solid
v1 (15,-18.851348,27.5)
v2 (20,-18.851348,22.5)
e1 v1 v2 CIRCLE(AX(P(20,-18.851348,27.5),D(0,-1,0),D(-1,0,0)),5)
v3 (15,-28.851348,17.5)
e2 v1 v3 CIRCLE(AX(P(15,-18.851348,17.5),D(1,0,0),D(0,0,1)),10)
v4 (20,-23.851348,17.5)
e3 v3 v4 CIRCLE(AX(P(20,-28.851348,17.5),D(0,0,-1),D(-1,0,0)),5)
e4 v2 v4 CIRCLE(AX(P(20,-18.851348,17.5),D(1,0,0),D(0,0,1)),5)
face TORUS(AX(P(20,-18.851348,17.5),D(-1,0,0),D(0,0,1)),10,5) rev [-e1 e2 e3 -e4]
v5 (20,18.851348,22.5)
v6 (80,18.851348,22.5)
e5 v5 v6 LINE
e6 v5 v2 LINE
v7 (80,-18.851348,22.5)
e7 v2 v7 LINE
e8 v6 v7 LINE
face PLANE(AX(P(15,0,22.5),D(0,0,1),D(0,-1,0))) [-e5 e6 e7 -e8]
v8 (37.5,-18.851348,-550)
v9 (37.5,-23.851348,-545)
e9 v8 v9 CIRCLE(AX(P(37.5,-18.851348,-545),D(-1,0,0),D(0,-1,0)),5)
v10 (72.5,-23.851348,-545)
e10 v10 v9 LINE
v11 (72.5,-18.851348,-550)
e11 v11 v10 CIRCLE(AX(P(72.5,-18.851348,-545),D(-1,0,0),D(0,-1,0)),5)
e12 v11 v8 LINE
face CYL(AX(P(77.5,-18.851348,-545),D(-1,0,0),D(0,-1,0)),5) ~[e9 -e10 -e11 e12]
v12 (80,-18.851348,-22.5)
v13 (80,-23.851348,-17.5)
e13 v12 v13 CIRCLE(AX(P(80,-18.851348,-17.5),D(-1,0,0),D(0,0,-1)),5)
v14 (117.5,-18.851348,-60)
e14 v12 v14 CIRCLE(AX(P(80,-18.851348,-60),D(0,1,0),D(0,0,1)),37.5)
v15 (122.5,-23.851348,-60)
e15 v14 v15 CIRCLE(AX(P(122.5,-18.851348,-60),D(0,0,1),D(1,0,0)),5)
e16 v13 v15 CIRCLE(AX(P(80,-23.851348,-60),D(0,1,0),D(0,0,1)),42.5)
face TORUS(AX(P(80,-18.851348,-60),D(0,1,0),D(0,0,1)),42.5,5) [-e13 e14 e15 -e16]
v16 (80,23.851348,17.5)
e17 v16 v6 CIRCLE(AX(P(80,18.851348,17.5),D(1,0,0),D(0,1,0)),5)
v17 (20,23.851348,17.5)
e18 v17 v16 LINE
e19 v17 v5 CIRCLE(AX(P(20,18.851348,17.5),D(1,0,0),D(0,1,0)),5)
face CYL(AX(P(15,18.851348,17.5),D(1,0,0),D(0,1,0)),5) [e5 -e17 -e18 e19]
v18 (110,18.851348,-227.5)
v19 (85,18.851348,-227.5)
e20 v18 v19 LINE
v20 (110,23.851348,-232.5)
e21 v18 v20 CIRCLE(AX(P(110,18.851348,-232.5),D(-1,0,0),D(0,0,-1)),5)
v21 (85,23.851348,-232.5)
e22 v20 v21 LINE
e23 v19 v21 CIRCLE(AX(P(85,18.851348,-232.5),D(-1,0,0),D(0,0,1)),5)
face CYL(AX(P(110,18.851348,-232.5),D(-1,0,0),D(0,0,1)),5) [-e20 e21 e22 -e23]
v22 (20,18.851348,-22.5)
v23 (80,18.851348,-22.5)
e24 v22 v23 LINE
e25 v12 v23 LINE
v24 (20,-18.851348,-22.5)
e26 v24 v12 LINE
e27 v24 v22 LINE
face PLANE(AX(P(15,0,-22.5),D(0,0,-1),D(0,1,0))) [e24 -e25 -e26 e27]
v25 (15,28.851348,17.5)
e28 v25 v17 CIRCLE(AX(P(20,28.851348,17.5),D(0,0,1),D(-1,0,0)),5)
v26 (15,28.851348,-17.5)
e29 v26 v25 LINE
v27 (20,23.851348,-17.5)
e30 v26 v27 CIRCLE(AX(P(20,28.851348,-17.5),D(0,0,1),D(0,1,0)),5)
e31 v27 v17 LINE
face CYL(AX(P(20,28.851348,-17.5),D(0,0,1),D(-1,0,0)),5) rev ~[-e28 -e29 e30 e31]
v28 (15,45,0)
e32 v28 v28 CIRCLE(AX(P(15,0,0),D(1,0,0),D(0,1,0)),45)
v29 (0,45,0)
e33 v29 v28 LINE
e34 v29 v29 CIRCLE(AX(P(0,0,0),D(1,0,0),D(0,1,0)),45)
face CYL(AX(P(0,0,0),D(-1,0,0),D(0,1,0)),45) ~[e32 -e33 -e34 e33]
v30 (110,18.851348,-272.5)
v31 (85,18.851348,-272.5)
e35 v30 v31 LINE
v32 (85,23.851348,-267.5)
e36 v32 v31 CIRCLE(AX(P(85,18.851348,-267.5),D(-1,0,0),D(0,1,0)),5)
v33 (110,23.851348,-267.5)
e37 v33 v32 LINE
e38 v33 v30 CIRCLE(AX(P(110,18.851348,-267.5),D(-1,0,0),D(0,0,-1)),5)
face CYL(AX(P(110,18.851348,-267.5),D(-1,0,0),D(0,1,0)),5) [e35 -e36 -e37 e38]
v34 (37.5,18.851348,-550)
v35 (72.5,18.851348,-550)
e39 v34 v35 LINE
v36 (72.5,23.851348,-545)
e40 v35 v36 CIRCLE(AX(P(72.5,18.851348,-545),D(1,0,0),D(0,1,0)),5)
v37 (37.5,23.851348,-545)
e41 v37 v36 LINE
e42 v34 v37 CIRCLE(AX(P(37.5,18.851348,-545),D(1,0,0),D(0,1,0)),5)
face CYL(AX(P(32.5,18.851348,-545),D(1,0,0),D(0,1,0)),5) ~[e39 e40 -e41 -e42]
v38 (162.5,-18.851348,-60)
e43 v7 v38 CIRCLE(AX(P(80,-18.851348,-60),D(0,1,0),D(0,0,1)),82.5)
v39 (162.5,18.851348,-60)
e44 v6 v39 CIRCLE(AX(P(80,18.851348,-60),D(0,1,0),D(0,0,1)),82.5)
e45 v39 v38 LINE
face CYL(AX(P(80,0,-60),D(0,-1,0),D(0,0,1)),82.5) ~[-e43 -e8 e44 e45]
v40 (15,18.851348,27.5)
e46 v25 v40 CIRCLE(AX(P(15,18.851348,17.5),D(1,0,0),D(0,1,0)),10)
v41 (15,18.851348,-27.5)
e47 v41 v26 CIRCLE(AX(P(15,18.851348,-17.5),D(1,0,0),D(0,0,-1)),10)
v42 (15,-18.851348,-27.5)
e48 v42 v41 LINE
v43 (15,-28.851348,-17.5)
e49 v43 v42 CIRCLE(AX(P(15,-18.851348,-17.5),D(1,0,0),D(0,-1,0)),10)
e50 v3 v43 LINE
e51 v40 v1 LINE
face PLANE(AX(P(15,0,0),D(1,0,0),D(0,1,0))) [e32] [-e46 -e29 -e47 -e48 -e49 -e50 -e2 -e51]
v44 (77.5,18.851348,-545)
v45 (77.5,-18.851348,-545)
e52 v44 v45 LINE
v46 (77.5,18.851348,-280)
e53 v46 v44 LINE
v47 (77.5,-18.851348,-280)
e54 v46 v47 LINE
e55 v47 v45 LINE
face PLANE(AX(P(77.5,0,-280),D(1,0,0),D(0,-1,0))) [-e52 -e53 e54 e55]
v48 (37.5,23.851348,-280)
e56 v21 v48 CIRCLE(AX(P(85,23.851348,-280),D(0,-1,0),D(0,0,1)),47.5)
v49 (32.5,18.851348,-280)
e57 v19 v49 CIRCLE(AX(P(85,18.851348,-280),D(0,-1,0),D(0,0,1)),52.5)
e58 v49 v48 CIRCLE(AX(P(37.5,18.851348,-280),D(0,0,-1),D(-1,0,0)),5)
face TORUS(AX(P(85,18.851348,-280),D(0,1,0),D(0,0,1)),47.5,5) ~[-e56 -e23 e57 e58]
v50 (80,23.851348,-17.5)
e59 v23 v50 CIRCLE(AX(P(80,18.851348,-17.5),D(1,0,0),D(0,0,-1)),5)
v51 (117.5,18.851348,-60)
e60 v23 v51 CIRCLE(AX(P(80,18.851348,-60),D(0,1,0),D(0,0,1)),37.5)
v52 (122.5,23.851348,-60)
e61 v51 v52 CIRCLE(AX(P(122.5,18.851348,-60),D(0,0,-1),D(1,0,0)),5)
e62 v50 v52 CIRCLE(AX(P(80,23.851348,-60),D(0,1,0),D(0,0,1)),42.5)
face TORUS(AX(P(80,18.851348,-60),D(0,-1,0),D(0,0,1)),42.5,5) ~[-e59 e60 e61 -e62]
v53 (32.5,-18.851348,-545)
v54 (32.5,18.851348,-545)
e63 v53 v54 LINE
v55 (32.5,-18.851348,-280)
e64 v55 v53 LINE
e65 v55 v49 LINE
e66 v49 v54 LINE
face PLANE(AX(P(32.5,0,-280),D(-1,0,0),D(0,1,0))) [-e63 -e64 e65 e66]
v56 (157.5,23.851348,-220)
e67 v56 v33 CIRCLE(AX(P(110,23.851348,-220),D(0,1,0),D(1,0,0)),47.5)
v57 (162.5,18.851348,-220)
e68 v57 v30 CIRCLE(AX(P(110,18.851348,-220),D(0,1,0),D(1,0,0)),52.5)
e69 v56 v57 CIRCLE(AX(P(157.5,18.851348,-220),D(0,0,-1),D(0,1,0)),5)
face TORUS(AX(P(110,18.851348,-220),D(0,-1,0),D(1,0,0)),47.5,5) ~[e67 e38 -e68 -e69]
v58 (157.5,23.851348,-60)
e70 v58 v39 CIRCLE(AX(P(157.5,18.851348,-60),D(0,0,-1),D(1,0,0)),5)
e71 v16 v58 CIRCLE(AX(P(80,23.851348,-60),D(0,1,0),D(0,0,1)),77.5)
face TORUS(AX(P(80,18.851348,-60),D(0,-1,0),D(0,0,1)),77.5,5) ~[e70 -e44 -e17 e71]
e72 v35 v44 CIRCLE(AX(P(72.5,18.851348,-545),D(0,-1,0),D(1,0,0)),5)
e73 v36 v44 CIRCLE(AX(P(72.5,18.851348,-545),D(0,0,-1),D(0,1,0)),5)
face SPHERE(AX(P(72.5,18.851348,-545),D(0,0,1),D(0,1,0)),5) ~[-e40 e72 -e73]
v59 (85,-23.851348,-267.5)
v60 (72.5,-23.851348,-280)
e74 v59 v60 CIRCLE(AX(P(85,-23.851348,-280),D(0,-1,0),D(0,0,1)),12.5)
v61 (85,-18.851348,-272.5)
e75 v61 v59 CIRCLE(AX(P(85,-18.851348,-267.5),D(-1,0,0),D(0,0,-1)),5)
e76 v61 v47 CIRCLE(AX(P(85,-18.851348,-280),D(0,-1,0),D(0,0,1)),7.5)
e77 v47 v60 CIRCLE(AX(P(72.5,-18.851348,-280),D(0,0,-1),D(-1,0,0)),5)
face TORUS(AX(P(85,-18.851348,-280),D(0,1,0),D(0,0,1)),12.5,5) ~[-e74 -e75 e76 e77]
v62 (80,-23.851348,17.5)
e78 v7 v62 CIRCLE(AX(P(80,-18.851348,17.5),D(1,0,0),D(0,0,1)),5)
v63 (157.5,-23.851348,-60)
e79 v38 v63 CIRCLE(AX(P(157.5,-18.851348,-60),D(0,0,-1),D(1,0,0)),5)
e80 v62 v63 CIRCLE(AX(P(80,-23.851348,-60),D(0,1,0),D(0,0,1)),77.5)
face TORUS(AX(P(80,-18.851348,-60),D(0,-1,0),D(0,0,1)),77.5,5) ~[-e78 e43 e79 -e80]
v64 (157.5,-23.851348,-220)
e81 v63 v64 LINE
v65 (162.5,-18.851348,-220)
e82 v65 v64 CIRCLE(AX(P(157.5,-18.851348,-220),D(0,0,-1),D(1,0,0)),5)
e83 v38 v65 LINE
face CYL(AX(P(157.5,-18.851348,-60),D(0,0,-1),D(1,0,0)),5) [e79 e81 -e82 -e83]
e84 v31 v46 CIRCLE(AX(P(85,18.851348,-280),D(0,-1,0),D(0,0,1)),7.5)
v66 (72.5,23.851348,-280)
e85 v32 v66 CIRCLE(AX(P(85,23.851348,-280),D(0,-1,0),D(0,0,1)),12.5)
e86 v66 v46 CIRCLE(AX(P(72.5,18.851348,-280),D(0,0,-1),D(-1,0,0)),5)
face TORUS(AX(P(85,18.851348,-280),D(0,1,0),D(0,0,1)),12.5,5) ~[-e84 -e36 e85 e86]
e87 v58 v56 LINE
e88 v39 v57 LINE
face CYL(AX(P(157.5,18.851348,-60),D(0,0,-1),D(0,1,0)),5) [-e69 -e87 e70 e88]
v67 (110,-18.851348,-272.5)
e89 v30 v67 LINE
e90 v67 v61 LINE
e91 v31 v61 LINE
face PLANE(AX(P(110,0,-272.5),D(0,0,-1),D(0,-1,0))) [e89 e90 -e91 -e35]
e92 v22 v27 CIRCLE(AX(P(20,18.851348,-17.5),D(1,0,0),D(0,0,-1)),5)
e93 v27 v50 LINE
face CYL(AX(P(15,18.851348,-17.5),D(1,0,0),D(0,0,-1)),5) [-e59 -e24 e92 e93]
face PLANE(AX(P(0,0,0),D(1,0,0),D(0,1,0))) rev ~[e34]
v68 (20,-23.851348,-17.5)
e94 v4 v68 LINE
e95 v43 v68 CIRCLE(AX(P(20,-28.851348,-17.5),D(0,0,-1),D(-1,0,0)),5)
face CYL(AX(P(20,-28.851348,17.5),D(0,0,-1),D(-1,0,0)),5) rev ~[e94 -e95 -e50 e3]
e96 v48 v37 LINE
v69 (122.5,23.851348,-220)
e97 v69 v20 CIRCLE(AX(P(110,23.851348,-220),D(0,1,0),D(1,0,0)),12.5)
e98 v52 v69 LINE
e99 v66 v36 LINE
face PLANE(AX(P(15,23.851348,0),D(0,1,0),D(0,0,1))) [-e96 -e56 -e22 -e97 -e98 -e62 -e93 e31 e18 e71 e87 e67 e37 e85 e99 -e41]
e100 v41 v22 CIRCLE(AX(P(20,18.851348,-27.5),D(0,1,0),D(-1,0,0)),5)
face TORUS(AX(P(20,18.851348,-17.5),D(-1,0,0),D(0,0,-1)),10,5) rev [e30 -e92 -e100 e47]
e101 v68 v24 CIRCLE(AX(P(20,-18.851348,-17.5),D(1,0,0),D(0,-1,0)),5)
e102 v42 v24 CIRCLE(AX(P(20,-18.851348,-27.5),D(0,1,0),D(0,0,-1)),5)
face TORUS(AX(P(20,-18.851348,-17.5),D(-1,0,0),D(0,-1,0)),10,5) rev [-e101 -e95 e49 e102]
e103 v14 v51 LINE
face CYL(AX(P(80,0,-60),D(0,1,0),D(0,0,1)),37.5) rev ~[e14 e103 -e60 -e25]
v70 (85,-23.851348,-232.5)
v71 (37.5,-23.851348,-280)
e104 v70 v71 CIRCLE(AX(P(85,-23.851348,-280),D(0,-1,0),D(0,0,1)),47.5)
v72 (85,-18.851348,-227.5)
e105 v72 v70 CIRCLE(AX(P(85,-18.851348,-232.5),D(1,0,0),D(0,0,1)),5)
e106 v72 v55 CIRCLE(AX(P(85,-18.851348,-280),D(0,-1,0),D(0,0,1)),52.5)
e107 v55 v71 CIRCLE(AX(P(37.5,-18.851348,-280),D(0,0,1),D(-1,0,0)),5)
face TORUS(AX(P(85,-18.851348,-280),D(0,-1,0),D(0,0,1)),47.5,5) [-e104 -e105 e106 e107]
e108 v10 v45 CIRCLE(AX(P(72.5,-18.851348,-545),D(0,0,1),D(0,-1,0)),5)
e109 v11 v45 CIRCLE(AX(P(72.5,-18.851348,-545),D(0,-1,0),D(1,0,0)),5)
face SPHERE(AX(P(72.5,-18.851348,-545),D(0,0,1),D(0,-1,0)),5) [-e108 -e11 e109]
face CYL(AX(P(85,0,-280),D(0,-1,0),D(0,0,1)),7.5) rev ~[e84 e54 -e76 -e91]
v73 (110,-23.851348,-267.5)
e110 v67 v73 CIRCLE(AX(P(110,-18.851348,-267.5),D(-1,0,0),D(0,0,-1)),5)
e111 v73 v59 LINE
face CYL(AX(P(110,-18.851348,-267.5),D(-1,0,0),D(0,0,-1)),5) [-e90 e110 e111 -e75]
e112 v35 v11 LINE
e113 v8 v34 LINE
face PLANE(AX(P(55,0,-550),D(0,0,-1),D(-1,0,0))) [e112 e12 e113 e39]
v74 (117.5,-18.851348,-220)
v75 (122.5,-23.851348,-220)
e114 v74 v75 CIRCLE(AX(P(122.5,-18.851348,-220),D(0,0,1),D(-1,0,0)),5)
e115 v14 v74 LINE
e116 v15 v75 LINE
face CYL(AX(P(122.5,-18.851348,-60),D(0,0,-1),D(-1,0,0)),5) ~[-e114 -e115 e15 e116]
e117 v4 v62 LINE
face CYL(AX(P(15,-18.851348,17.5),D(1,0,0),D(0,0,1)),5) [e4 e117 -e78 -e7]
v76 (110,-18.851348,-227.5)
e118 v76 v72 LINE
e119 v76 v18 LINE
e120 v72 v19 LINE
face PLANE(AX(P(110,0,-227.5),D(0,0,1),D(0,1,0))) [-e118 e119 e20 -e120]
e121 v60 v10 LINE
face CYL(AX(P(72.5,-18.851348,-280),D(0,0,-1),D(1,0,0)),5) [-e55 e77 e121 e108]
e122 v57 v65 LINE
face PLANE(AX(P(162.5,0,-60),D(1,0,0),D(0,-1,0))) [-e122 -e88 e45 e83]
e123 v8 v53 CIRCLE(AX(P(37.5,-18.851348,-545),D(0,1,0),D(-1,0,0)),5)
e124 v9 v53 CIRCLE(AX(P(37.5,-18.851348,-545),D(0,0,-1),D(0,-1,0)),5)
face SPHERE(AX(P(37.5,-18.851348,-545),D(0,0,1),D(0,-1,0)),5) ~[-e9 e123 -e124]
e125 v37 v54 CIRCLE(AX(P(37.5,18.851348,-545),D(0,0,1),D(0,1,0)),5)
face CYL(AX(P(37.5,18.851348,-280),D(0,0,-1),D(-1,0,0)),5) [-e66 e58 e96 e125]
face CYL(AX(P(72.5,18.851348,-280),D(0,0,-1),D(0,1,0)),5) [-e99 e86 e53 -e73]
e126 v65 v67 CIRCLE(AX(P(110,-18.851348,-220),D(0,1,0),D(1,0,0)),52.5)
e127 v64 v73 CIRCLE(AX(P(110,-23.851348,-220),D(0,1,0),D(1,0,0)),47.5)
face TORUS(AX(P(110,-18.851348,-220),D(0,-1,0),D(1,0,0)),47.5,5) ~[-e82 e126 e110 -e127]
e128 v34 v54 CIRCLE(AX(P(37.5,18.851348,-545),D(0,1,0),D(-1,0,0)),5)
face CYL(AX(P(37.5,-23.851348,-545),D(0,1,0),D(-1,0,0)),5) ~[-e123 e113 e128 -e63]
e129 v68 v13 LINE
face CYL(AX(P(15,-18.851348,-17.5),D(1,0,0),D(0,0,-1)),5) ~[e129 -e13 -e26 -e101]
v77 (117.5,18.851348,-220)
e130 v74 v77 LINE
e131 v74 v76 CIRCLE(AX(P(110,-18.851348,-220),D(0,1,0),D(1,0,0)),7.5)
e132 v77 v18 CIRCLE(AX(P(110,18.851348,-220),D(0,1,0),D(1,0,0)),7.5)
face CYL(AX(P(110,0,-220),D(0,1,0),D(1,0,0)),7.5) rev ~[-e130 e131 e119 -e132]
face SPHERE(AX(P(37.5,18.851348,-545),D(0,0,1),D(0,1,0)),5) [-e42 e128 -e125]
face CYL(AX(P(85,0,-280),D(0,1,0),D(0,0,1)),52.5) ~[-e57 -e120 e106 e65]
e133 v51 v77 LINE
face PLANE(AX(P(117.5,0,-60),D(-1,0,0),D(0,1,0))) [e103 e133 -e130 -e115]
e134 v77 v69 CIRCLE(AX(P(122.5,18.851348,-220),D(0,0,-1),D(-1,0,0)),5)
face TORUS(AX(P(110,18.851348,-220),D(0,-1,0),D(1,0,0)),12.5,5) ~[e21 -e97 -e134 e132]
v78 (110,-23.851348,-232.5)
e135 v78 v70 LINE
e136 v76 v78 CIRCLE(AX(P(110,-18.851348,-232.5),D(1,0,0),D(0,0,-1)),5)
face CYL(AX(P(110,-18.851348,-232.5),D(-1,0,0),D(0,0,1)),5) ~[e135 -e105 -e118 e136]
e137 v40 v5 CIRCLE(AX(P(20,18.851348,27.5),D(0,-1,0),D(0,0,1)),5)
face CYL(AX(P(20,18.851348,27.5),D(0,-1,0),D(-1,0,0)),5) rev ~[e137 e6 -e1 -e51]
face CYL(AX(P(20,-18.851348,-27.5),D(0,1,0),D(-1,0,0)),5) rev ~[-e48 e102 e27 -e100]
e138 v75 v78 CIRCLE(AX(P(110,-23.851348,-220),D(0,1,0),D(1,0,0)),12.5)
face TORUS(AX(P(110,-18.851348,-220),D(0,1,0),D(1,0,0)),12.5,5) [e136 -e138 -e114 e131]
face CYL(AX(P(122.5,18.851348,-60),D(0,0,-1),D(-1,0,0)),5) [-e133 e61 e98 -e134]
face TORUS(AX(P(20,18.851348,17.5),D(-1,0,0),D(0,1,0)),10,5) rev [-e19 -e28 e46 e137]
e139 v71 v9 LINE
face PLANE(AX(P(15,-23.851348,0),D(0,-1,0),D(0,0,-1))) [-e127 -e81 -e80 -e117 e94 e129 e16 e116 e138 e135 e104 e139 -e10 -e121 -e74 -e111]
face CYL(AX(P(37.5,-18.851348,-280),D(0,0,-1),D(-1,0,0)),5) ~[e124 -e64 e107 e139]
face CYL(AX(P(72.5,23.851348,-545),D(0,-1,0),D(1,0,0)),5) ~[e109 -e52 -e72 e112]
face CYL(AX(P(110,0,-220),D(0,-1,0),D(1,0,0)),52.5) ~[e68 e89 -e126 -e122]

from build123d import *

# Parameters (mm, degrees)
F0_R     = 45
F1_DEPTH = 15
F2_W     = 47.7026963846
F2_H     = 45
F5_F1_R  = 5
F5_F2_R  = 5


with BuildPart() as f1:
    # F0 (on Right) → F1 (new body)
    with BuildSketch(Plane.YZ):
        Circle(F0_R)
    extrude(amount=F1_DEPTH)

    # F4: sweep along a path in F3
    with BuildLine(Plane.XZ) as f4_path:
        Line((15, 0), (80, 0))
        ThreePointArc((80, 0), (122.4264068712, -17.5735931288), (140, -60))
        Line((140, -60), (140, -220))
        ThreePointArc((140, -220), (131.2132034356, -241.2132034356), (110, -250))
        Line((110, -250), (85, -250))
        ThreePointArc((85, -250), (63.7867965644, -258.7867965644), (55, -280))
        Line((55, -280), (55, -550))
    # F2 (on face) → F4 (sweep)
    with BuildSketch(Plane.YZ.offset(15)):
        Rectangle(F2_W, F2_H)
    sweep(path=f4_path.line)

    # F5: fillet of radius 5 on 34 edges, made by hand

    # F5_f1
    f5_f1_edges = [f1.edges().sort_by_distance(p)[0] for p in [
        (47.5, -23.8513481923, 22.5),
        (47.5, -23.8513481923, -22.5),
        (106.5165042945, -23.8513481923, -33.4834957055),
        (117.5, -23.8513481923, -140),
        (115.3033008589, -23.8513481923, -225.3033008589),
        (97.5, -23.8513481923, -227.5),
        (47.8768939877, -23.8513481923, -242.8768939877),
        (32.5, -23.8513481923, -415),
        (55, -23.8513481923, -550),
        (77.5, -23.8513481923, -415),
        (79.6966991411, -23.8513481923, -274.6966991411),
        (97.5, -23.8513481923, -272.5),
        (147.1231060123, -23.8513481923, -257.1231060123),
        (162.5, -23.8513481923, -140),
        (138.3363094479, -23.8513481923, -1.6636905521),
        (47.5, 23.8513481923, -22.5),
        (47.5, 23.8513481923, 22.5),
        (138.3363094479, 23.8513481923, -1.6636905521),
        (162.5, 23.8513481923, -140),
        (147.1231060123, 23.8513481923, -257.1231060123),
        (97.5, 23.8513481923, -272.5),
        (79.6966991411, 23.8513481923, -274.6966991411),
        (77.5, 23.8513481923, -415),
        (55, 23.8513481923, -550),
        (32.5, 23.8513481923, -415),
        (47.8768939877, 23.8513481923, -242.8768939877),
        (97.5, 23.8513481923, -227.5),
        (115.3033008589, 23.8513481923, -225.3033008589),
        (117.5, 23.8513481923, -140),
        (106.5165042945, 23.8513481923, -33.4834957055),
        (32.5, 0, -550),
        (77.5, 0, -550),
    ]]
    fillet(f5_f1_edges, radius=F5_F1_R)

    # F5_f2
    f5_f2_edges = [f1.edges().sort_by_distance(p)[0] for p in [
        (15, -23.8513481923, 0),
        (15, 23.8513481923, 0),
        (15, 22.3868820983, -21.0355339059),
        (15, 22.3868820983, 21.0355339059),
        (15, -22.3868820983, 21.0355339059),
        (15, -22.3868820983, -21.0355339059),
    ]]
    fillet(f5_f2_edges, radius=F5_F2_R)


solid = f1.part
